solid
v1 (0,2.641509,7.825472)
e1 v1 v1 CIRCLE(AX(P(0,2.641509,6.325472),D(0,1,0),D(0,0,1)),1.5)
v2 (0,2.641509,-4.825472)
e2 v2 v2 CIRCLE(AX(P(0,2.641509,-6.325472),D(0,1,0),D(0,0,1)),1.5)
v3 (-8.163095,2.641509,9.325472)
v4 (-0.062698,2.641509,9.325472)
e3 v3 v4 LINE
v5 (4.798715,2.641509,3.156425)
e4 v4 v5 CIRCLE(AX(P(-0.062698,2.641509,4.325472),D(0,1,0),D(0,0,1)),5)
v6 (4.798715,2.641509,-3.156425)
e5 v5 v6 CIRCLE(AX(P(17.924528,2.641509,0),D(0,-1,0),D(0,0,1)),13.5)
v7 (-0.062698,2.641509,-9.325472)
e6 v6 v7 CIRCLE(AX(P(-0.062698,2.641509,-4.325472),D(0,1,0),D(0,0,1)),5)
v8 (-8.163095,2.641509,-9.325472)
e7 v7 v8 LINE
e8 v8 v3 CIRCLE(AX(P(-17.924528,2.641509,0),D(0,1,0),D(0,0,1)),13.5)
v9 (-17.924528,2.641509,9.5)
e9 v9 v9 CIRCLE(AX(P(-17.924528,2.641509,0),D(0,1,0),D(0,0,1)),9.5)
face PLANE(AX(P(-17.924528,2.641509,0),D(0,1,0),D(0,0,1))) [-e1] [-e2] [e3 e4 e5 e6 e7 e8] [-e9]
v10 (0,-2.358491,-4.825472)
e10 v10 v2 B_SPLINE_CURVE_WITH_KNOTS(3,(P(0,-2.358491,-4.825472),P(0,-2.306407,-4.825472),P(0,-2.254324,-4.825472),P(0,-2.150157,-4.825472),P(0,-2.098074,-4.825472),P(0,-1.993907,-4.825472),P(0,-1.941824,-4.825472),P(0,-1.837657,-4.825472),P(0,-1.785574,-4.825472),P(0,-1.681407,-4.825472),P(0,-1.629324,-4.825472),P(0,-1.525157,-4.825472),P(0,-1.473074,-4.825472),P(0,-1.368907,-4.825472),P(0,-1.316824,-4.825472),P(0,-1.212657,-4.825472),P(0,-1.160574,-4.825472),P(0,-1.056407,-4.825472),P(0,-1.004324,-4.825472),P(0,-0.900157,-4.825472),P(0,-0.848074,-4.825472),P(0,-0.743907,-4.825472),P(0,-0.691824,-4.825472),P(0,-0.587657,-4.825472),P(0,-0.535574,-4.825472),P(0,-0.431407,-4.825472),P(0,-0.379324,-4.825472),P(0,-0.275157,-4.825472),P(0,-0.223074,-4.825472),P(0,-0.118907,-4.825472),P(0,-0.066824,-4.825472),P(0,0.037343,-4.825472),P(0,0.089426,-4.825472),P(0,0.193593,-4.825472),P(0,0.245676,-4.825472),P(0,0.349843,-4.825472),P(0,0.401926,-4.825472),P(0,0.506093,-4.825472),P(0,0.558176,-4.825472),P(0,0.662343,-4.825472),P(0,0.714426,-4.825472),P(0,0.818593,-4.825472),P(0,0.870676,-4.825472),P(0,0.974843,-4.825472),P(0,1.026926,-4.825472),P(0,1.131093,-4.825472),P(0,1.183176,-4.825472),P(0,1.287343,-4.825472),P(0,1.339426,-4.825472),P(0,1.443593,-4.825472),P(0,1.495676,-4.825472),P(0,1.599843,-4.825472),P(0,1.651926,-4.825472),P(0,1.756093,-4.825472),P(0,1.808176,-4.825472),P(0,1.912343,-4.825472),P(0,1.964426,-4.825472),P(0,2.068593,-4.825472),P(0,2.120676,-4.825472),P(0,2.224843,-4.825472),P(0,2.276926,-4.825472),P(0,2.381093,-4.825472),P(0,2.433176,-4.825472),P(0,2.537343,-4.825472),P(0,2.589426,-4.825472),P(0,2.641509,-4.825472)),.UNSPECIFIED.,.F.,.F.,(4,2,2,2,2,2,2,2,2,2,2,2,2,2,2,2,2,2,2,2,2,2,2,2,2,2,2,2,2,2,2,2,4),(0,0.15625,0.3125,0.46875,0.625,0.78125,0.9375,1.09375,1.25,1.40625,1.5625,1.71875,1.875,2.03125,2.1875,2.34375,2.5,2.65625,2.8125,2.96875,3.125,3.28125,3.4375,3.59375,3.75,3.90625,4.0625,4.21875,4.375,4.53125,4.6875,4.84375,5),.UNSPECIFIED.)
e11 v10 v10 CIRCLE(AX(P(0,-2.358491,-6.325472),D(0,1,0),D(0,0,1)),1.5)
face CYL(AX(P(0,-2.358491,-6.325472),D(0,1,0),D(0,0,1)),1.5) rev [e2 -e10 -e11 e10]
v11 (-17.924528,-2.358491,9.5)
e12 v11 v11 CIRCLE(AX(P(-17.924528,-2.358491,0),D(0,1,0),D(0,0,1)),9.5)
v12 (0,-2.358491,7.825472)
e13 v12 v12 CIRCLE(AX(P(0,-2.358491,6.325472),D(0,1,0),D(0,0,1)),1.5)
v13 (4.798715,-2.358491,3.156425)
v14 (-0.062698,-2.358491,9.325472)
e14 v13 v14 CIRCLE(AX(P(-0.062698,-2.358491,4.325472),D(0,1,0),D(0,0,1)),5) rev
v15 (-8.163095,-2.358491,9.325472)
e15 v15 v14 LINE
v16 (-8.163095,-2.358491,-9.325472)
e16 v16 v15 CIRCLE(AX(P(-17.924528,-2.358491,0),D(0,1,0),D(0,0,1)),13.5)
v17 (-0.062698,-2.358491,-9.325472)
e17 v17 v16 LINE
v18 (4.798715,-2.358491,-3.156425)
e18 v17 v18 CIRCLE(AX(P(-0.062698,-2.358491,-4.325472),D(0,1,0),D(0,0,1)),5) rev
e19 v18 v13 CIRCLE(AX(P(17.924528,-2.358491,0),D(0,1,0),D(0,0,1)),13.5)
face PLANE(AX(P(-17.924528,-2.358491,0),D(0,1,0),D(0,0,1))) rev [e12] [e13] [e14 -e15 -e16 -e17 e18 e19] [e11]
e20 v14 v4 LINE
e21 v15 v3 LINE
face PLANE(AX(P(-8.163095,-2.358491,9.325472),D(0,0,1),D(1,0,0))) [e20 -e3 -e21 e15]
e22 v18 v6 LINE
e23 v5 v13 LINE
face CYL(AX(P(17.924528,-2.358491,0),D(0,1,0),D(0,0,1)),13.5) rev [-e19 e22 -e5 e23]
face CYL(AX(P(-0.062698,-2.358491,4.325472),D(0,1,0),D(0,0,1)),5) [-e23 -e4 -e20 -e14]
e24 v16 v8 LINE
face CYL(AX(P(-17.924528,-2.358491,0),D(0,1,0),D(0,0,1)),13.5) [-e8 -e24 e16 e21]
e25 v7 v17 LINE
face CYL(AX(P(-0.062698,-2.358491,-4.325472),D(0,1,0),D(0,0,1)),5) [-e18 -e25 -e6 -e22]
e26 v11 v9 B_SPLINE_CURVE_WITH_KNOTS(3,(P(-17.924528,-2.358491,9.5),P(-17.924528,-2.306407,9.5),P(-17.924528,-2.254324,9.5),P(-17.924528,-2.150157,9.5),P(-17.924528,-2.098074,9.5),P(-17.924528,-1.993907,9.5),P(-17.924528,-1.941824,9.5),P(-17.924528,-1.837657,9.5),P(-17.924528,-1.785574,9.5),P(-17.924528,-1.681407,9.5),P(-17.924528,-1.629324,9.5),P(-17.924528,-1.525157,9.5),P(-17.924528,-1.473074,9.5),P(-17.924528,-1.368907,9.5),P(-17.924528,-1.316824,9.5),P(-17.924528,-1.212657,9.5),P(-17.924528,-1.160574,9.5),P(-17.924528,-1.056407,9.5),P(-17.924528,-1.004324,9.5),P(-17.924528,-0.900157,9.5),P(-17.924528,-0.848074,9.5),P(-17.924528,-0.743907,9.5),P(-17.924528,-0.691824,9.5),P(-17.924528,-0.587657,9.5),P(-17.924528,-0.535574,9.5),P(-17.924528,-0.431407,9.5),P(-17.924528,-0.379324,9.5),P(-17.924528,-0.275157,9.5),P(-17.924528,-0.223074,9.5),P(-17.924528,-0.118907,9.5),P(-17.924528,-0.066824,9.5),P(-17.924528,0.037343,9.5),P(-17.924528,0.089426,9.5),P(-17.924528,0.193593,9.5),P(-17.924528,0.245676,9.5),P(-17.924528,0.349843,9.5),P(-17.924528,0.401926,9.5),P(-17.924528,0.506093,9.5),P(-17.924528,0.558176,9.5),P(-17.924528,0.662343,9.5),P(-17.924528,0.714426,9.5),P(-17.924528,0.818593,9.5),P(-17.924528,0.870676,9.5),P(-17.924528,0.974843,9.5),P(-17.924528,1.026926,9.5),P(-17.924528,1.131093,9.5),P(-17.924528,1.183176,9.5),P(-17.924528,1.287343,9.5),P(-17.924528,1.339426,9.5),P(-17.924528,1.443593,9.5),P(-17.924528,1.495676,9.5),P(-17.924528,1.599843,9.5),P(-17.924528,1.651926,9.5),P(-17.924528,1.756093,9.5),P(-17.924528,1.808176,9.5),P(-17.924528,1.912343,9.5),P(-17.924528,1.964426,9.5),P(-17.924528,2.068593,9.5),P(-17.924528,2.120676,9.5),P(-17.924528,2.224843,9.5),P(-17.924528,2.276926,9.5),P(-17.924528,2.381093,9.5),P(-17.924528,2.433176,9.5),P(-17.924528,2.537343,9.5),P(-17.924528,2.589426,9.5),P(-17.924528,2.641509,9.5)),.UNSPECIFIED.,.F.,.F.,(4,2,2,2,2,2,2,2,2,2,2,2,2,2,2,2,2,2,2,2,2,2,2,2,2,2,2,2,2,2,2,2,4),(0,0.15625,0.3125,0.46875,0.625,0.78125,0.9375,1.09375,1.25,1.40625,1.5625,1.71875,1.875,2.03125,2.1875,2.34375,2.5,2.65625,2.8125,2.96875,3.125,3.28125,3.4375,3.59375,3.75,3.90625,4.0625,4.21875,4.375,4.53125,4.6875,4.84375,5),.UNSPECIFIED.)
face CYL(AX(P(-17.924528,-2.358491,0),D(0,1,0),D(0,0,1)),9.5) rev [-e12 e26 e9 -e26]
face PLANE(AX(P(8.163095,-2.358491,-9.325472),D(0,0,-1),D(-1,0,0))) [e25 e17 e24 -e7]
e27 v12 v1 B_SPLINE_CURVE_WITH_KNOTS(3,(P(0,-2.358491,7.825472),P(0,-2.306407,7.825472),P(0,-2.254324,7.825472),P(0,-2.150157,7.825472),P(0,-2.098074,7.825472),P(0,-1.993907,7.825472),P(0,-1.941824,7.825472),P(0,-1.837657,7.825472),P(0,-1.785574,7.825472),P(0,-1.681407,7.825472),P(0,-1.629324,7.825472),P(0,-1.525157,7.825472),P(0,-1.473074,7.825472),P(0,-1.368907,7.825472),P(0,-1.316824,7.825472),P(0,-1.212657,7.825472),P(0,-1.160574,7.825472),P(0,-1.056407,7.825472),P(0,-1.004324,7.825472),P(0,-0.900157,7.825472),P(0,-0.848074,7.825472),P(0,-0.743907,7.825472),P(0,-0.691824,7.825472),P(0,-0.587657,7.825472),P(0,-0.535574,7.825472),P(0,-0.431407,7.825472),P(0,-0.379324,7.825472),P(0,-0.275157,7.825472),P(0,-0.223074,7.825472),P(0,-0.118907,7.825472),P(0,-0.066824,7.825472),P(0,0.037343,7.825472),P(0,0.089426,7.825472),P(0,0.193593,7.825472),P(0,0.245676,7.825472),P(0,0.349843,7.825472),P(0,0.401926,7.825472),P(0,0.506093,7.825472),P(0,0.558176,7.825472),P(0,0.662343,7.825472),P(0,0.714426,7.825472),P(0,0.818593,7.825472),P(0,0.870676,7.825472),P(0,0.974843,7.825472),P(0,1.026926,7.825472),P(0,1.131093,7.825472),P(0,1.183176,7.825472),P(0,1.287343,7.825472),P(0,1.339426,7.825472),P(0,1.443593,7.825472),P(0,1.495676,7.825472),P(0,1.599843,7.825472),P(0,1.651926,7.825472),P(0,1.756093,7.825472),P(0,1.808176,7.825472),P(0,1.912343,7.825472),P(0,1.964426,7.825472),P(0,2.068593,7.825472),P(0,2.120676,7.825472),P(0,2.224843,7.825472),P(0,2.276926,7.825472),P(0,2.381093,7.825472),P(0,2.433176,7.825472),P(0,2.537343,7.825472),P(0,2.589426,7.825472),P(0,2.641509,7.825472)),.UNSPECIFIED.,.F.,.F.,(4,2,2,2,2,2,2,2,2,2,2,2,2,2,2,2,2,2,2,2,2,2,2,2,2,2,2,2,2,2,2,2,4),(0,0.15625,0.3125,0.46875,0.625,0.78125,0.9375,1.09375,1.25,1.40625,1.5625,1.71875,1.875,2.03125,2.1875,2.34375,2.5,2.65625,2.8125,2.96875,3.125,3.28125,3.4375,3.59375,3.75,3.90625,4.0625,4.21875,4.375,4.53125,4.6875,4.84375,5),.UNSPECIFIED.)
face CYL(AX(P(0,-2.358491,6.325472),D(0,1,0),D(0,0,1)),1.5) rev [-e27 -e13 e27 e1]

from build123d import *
from build123d.topology import SkipClean

# Parameters (mm, degrees)
SKETCH1_R           = 4.05
BOSS_EXTRUDE1_DEPTH = 5
SCALE1_SCALE        = 0.471698113
SKETCH2_R           = 1.910377358
BOSS_EXTRUDE3_DEPTH = 4.716981
SKETCH3_R           = 9.5
CUT_EXTRUDE1_DEPTH  = 35.525365892
SKETCH4_R           = 13.5
CUT_EXTRUDE2_DEPTH  = 35.525365892
SKETCH5_R           = 1.5
CUT_EXTRUDE3_DEPTH  = 35.525365892
FILLET1_R           = 5
BOSS_EXTRUDE4_START = 5
SKETCH6_R           = 9.5
SKETCH6_R_2         = 1.5
BOSS_EXTRUDE4_DEPTH = 5


with BuildPart() as part:
    # Sketch1 → Boss-Extrude1 (new, symmetric)
    with BuildSketch(Plane(origin=(0, 0, 0), x_dir=(1, 0, 0), z_dir=(0, 1, 0))):
        with BuildLine():
            Line((-38, 7.05), (38, 7.05))
            ThreePointArc((38, 7.05), (45.05, 0), (38, -7.05))
            Line((38, -7.05), (-38, -7.05))
            ThreePointArc((-38, -7.05), (-45.05, 0), (-38, 7.05))
        make_face()
        with Locations(Location((-38, 0, 0), (0, 0, 270))):
            Circle(SKETCH1_R, mode=Mode.SUBTRACT)
        with Locations(Location((38, 0, 0), (0, 0, 270))):
            Circle(SKETCH1_R, mode=Mode.SUBTRACT)
    extrude(amount=BOSS_EXTRUDE1_DEPTH, both=True)


with BuildPart() as part_1:
    # Scale1: scaled about (0, 0, 0)
    add(part.part.scale(SCALE1_SCALE))

    # Sketch2 → Boss-Extrude3 (add, through all)
    with BuildSketch(Plane(origin=(0, 2.358490566, 0), x_dir=(1, 0, 0), z_dir=(0, 1, 0))):
        with BuildLine():
            Line((8.163095128, 9.325471698), (-8.163095128, 9.325471698))
            ThreePointArc((-8.163095128, 9.325471698), (-31.424528302, 0), (-8.163095128, -9.325471698))
            Line((-8.163095128, -9.325471698), (8.163095128, -9.325471698))
            ThreePointArc((8.163095128, -9.325471698), (31.424528302, 0), (8.163095128, 9.325471698))
        make_face()
        with Locations(Location((-17.924528302, 0, 0), (0, 0, 270))):
            Circle(SKETCH2_R, mode=Mode.SUBTRACT)
        with Locations(Location((17.924528302, 0, 0), (0, 0, 270))):
            Circle(SKETCH2_R, mode=Mode.SUBTRACT)
    extrude(amount=-BOSS_EXTRUDE3_DEPTH)

    # Sketch3 → Cut-Extrude1 (cut, through all)
    with BuildSketch(Plane(origin=(0, 2.358490566, 0), x_dir=(1, 0, 0), z_dir=(0, 1, 0))):
        with Locations(Location((-17.924528302, 0, 0), (0, 0, 270))):
            Circle(SKETCH3_R)
        with Locations(Location((17.924528302, 0, 0), (0, 0, 270))):
            Circle(SKETCH3_R)
    extrude(amount=-CUT_EXTRUDE1_DEPTH, mode=Mode.SUBTRACT)

    # Sketch4 → Cut-Extrude2 (cut, through all)
    with BuildSketch(Plane(origin=(0, 2.358490566, 0), x_dir=(1, 0, 0), z_dir=(0, 1, 0))):
        with Locations((17.924528302, 0)):
            Circle(SKETCH4_R)
    extrude(amount=-CUT_EXTRUDE2_DEPTH, mode=Mode.SUBTRACT)

    # Sketch5 → Cut-Extrude3 (cut, through all)
    with BuildSketch(Plane(origin=(0, 2.358490566, 0), x_dir=(1, 0, 0), z_dir=(0, 1, 0))):
        with Locations(Location((0, 6.325471698, 0), (0, 0, 270))):
            Circle(SKETCH5_R)
        with Locations(Location((0, -6.325471698, 0), (0, 0, 270))):
            Circle(SKETCH5_R)
    extrude(amount=-CUT_EXTRUDE3_DEPTH, mode=Mode.SUBTRACT)

    # Fillet1
    # the kernel refuses this fillet: 5 mm, written as the material it takes off along each edge
    with BuildSketch(Plane(origin=(8.163095128, 22.922972313, -9.325471698), x_dir=(-0.47879135569736214, 0, 0.8779287201757795), z_dir=(0, -1, 0))) as fillet1_piece_1:
        with BuildLine():
            CenterArc((8.328082039, 4.827702878), FILLET1_R, 151.393506733, 103.521444362)
            Line((3.938438438, 7.221659656), (0, 0))
            ThreePointArc((0, 0), (3.51340961, 0.46520223), (7.02681922, 0))
        make_face()
    extrude(amount=45.845944493, mode=Mode.SUBTRACT)
    with BuildSketch(Plane(origin=(8.163095128, 22.922972313, 9.325471698), x_dir=(-1, 0, 0), z_dir=(0, -1, 0))) as fillet1_piece_2:
        with BuildLine():
            CenterArc((8.225792699, 5), FILLET1_R, 166.478555638, 103.521444362)
            ThreePointArc((3.364380301, 6.169046405), (2.090604549, 2.861788396), (0, 0))
            Line((0, 0), (8.225792699, 0))
        make_face()
    extrude(amount=45.845944493, mode=Mode.SUBTRACT)

    # Sketch6 → Boss-Extrude4 (add)
    with SkipClean():  # the faces are left unmerged after this step: merging them gives an invalid solid
        with BuildSketch(Plane(origin=(0, -2.358490566, 0), x_dir=(1, 0, 0), z_dir=(0, 1, 0)).offset(BOSS_EXTRUDE4_START)):
            with BuildLine():
                Line((-8.163095128, -9.325471698), (-0.062697571, -9.325471698))
                ThreePointArc((-0.062697571, -9.325471698), (3.864466293, -7.42020658), (4.798714827, -3.156425293))
                ThreePointArc((4.798714827, -3.156425293), (4.424528302, 0), (4.798714827, 3.156425293))
                ThreePointArc((4.798714827, 3.156425293), (3.864466293, 7.42020658), (-0.062697571, 9.325471698))
                Line((-0.062697571, 9.325471698), (-8.163095128, 9.325471698))
                ThreePointArc((-8.163095128, 9.325471698), (-31.424528302, 0), (-8.163095128, -9.325471698))
            make_face()
            with Locations(Location((-17.924528302, 0, 0), (0, 0, 270))):
                Circle(SKETCH6_R, mode=Mode.SUBTRACT)
            with Locations(Location((0, -6.325471698, 0), (0, 0, 270))):
                Circle(SKETCH6_R_2, mode=Mode.SUBTRACT)
            with Locations(Location((0, 6.325471698, 0), (0, 0, 270))):
                Circle(SKETCH6_R_2, mode=Mode.SUBTRACT)
        extrude(amount=-BOSS_EXTRUDE4_DEPTH)
    add(part_1.part.scale(1), mode=Mode.REPLACE)  # the faces are merged on a copy


solid = part_1.part
